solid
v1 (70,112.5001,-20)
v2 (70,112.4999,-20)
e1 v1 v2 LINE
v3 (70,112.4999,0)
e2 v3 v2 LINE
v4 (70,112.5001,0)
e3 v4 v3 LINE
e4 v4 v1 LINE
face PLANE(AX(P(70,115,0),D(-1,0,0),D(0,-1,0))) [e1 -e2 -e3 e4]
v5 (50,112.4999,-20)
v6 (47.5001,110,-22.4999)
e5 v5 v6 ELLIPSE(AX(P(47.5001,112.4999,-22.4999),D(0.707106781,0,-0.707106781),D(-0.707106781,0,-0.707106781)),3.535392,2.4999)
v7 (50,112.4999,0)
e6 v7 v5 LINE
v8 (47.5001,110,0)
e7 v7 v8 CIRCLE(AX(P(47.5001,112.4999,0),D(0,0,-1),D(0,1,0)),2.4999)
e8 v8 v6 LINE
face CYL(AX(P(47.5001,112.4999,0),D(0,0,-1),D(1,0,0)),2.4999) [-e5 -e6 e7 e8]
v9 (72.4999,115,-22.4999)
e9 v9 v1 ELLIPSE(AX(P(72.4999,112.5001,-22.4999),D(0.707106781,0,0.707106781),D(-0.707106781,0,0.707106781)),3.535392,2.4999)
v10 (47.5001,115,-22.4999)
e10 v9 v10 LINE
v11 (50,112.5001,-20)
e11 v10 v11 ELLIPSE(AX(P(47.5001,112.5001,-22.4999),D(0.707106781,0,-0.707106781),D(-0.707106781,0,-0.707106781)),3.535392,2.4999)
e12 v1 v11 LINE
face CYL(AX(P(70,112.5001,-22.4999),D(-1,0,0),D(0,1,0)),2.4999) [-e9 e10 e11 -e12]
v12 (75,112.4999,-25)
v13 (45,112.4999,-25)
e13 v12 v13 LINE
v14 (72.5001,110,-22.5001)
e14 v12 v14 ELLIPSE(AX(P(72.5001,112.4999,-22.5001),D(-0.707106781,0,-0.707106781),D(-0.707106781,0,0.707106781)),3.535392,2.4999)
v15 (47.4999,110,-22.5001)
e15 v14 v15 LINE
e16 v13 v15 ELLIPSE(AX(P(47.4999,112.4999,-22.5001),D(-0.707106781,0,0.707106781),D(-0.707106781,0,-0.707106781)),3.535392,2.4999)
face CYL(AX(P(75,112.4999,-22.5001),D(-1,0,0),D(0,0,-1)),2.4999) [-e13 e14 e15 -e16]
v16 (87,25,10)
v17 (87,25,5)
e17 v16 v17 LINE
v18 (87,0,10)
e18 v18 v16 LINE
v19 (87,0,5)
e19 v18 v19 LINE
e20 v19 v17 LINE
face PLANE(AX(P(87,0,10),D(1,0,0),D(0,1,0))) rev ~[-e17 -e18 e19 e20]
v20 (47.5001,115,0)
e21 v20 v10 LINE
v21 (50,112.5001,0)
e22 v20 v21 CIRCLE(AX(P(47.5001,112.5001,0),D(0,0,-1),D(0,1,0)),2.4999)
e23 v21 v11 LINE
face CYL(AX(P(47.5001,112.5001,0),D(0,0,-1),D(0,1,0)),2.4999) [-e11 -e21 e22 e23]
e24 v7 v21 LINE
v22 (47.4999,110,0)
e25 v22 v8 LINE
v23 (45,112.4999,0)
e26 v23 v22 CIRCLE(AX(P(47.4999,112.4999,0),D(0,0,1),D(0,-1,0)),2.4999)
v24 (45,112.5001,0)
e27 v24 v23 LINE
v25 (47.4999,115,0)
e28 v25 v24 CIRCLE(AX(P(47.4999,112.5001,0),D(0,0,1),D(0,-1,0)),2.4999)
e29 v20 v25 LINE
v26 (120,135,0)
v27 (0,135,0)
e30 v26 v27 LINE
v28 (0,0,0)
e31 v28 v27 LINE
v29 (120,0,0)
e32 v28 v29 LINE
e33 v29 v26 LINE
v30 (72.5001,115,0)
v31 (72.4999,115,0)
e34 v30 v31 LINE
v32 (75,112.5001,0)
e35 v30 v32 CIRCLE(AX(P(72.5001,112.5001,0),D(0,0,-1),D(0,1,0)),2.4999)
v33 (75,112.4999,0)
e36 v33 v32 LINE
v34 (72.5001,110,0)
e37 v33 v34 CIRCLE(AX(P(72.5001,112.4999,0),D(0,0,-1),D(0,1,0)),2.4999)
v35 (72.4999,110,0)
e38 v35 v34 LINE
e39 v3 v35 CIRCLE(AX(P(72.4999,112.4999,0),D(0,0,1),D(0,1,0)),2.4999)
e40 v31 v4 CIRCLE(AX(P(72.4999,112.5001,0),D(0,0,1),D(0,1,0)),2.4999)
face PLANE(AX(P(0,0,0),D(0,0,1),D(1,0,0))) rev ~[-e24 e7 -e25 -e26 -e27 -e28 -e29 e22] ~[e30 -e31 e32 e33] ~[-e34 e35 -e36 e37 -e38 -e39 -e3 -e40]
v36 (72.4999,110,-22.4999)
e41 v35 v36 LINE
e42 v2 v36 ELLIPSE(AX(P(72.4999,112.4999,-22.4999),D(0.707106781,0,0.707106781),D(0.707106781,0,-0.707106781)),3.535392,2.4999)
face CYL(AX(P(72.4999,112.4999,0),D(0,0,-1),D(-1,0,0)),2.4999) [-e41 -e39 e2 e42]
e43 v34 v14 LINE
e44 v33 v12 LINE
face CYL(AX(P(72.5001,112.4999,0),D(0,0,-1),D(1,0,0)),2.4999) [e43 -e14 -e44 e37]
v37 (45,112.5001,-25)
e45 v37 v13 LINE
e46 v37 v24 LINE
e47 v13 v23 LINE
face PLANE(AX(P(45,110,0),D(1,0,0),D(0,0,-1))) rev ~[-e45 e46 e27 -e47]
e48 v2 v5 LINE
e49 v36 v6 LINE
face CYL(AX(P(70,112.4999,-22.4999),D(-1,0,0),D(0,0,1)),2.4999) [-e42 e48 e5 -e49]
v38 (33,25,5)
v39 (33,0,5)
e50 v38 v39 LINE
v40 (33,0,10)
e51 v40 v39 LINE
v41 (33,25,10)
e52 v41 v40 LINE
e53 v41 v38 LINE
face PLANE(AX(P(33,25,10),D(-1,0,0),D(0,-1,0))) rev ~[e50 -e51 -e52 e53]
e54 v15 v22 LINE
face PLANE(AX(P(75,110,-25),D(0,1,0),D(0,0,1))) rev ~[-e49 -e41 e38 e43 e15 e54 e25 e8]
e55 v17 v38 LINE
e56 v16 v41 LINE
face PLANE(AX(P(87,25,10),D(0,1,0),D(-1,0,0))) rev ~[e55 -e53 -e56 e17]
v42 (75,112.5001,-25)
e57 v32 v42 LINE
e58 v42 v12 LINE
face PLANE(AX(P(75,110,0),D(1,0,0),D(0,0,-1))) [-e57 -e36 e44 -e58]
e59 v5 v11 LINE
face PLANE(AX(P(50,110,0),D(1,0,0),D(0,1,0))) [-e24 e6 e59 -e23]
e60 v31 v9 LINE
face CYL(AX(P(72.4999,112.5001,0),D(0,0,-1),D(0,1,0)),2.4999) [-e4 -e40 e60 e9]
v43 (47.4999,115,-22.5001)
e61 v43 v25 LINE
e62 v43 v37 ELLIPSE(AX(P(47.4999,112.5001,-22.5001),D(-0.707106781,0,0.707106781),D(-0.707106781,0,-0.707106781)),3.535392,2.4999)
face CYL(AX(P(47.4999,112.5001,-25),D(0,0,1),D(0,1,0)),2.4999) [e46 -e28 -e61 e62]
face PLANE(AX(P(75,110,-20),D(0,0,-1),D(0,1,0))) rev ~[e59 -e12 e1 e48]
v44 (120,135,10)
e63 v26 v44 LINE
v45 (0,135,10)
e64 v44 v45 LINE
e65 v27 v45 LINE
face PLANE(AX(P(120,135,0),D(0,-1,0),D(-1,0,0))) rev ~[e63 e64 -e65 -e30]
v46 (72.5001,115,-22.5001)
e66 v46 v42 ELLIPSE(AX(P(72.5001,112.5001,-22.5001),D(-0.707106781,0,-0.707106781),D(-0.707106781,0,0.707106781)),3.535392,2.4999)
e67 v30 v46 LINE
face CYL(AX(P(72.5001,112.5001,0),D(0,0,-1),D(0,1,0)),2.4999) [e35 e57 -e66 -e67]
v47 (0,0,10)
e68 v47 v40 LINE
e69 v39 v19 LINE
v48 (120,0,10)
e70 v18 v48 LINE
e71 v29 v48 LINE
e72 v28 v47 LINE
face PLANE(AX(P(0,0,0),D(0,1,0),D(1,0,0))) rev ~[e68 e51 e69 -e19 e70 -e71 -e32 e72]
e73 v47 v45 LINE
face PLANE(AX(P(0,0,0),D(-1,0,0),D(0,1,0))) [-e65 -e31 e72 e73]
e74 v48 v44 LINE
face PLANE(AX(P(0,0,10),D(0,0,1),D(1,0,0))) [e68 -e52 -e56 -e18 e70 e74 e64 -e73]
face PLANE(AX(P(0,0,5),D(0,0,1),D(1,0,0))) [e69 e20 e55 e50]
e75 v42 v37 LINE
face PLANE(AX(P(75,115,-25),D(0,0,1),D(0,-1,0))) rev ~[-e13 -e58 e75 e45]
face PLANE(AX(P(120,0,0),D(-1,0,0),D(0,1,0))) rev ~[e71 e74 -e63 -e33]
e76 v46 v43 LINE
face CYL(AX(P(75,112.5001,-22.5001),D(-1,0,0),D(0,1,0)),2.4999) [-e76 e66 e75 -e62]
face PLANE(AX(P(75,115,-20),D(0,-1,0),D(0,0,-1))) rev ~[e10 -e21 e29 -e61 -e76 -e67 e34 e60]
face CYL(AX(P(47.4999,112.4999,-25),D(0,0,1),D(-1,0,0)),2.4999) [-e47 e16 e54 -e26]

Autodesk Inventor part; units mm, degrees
ref_plane "YZ Plane" through (0, 0, 0) normal (1, 0, 0) x (0, 1, 0)
ref_plane "XZ Plane" through (0, 0, 0) normal (0, 1, 0) x (-1, 0, 0)
ref_plane "XY Plane" through (0, 0, 0) normal (0, 0, 1) x (1, 0, 0)
sketch "Skizze1" plane through (0, 0, 0) normal (0, 0, 1) x (1, 0, 0)
  line L0 (-24, 0) -> (144, 0) projected
  line L1 (0, -27) -> (0, 162) projected
  line L2 (0, 0) -> (120, 0)
  line L3 (120, 0) -> (120, 135)
  line L4 (120, 135) -> (0, 135)
  line L5 (0, 135) -> (0, 0)
  point P0 (0, 135)
  dimension "d0" = 135
  dimension "d1" = 120
extrude "Extrusion1" add sketch "Skizze1" along normal blind 10
sketch "Skizze2" plane through (0, 0, 10) normal (0, 0, 1) x (1, 0, 0)
  line L0 (0, 0) -> (120, 0) projected
  line L1 (33, 0) -> (87, 0)
  line L2 (87, 0) -> (87, 25)
  line L3 (87, 25) -> (33, 25)
  line L4 (33, 25) -> (33, 0)
  line L5 (0, 135) -> (0, 0) projected
  dimension "d4" = 54
  dimension "d5" = 25
  dimension "d6" = 33
extrude "Extrusion2" cut sketch "Skizze2" against normal blind 5
sketch "Skizze3" plane through (0, 0, 0) normal (0, 0, -1) x (-1, 0, 0)
  line L0 (-75, 115) -> (-70, 115)
  line L1 (-70, 115) -> (-70, 110)
  line L2 (-70, 110) -> (-75, 110)
  line L3 (-75, 110) -> (-75, 115)
  line L4 (-50, 115) -> (-45, 115)
  line L5 (-45, 115) -> (-45, 110)
  line L6 (-45, 110) -> (-50, 110)
  line L7 (-50, 110) -> (-50, 115)
  line L8 (-120, 135) -> (0, 135)
  line L9 (-120, 0) -> (-120, 135) projected
  line L10 (0, 135) -> (0, 0) projected
  line L11 (-120, 135) -> (0, 135) projected
  dimension "d9" = 5
  dimension "d10" = 5
  dimension "d11" = 5
  dimension "d12" = 5
  dimension "d13" = 20
  dimension "d14" = 20
  dimension "d15" = 45
  dimension "d16" = 45
  dimension "d17" = 20
extrude "Extrusion3" add sketch "Skizze3" along normal blind 20
sketch "Skizze4" plane through (75, 110, 0) normal (1, 0, 0) x (0, 0, -1)
  line L0 (0, 5) -> (20, 5) projected
  line L1 (20, 5) -> (25, 5)
  line L2 (25, 5) -> (25, 0)
  line L3 (25, 0) -> (20, 0)
  line L4 (20, 0) -> (20, 5)
  point P0 (0, -110)
  dimension "d20" = 5
  dimension "d21" = 5
extrude "Extrusion4" add sketch "Skizze4" against normal blind 30
fillet "Rundung1" radius 2.5 12 edges at (60, 110, -25) (60, 115, -25) (75, 115, -12.5) (75, 110, -12.5) (45, 110, -12.5) (50, 110, -10) (70, 110, -10) (60, 110, -20) (50, 115, -10) (60, 115, -20) (70, 115, -10) (45, 115, -12.5)
properties part number "DeckelMess_Better" material "Acetalharz, Schwarz"
